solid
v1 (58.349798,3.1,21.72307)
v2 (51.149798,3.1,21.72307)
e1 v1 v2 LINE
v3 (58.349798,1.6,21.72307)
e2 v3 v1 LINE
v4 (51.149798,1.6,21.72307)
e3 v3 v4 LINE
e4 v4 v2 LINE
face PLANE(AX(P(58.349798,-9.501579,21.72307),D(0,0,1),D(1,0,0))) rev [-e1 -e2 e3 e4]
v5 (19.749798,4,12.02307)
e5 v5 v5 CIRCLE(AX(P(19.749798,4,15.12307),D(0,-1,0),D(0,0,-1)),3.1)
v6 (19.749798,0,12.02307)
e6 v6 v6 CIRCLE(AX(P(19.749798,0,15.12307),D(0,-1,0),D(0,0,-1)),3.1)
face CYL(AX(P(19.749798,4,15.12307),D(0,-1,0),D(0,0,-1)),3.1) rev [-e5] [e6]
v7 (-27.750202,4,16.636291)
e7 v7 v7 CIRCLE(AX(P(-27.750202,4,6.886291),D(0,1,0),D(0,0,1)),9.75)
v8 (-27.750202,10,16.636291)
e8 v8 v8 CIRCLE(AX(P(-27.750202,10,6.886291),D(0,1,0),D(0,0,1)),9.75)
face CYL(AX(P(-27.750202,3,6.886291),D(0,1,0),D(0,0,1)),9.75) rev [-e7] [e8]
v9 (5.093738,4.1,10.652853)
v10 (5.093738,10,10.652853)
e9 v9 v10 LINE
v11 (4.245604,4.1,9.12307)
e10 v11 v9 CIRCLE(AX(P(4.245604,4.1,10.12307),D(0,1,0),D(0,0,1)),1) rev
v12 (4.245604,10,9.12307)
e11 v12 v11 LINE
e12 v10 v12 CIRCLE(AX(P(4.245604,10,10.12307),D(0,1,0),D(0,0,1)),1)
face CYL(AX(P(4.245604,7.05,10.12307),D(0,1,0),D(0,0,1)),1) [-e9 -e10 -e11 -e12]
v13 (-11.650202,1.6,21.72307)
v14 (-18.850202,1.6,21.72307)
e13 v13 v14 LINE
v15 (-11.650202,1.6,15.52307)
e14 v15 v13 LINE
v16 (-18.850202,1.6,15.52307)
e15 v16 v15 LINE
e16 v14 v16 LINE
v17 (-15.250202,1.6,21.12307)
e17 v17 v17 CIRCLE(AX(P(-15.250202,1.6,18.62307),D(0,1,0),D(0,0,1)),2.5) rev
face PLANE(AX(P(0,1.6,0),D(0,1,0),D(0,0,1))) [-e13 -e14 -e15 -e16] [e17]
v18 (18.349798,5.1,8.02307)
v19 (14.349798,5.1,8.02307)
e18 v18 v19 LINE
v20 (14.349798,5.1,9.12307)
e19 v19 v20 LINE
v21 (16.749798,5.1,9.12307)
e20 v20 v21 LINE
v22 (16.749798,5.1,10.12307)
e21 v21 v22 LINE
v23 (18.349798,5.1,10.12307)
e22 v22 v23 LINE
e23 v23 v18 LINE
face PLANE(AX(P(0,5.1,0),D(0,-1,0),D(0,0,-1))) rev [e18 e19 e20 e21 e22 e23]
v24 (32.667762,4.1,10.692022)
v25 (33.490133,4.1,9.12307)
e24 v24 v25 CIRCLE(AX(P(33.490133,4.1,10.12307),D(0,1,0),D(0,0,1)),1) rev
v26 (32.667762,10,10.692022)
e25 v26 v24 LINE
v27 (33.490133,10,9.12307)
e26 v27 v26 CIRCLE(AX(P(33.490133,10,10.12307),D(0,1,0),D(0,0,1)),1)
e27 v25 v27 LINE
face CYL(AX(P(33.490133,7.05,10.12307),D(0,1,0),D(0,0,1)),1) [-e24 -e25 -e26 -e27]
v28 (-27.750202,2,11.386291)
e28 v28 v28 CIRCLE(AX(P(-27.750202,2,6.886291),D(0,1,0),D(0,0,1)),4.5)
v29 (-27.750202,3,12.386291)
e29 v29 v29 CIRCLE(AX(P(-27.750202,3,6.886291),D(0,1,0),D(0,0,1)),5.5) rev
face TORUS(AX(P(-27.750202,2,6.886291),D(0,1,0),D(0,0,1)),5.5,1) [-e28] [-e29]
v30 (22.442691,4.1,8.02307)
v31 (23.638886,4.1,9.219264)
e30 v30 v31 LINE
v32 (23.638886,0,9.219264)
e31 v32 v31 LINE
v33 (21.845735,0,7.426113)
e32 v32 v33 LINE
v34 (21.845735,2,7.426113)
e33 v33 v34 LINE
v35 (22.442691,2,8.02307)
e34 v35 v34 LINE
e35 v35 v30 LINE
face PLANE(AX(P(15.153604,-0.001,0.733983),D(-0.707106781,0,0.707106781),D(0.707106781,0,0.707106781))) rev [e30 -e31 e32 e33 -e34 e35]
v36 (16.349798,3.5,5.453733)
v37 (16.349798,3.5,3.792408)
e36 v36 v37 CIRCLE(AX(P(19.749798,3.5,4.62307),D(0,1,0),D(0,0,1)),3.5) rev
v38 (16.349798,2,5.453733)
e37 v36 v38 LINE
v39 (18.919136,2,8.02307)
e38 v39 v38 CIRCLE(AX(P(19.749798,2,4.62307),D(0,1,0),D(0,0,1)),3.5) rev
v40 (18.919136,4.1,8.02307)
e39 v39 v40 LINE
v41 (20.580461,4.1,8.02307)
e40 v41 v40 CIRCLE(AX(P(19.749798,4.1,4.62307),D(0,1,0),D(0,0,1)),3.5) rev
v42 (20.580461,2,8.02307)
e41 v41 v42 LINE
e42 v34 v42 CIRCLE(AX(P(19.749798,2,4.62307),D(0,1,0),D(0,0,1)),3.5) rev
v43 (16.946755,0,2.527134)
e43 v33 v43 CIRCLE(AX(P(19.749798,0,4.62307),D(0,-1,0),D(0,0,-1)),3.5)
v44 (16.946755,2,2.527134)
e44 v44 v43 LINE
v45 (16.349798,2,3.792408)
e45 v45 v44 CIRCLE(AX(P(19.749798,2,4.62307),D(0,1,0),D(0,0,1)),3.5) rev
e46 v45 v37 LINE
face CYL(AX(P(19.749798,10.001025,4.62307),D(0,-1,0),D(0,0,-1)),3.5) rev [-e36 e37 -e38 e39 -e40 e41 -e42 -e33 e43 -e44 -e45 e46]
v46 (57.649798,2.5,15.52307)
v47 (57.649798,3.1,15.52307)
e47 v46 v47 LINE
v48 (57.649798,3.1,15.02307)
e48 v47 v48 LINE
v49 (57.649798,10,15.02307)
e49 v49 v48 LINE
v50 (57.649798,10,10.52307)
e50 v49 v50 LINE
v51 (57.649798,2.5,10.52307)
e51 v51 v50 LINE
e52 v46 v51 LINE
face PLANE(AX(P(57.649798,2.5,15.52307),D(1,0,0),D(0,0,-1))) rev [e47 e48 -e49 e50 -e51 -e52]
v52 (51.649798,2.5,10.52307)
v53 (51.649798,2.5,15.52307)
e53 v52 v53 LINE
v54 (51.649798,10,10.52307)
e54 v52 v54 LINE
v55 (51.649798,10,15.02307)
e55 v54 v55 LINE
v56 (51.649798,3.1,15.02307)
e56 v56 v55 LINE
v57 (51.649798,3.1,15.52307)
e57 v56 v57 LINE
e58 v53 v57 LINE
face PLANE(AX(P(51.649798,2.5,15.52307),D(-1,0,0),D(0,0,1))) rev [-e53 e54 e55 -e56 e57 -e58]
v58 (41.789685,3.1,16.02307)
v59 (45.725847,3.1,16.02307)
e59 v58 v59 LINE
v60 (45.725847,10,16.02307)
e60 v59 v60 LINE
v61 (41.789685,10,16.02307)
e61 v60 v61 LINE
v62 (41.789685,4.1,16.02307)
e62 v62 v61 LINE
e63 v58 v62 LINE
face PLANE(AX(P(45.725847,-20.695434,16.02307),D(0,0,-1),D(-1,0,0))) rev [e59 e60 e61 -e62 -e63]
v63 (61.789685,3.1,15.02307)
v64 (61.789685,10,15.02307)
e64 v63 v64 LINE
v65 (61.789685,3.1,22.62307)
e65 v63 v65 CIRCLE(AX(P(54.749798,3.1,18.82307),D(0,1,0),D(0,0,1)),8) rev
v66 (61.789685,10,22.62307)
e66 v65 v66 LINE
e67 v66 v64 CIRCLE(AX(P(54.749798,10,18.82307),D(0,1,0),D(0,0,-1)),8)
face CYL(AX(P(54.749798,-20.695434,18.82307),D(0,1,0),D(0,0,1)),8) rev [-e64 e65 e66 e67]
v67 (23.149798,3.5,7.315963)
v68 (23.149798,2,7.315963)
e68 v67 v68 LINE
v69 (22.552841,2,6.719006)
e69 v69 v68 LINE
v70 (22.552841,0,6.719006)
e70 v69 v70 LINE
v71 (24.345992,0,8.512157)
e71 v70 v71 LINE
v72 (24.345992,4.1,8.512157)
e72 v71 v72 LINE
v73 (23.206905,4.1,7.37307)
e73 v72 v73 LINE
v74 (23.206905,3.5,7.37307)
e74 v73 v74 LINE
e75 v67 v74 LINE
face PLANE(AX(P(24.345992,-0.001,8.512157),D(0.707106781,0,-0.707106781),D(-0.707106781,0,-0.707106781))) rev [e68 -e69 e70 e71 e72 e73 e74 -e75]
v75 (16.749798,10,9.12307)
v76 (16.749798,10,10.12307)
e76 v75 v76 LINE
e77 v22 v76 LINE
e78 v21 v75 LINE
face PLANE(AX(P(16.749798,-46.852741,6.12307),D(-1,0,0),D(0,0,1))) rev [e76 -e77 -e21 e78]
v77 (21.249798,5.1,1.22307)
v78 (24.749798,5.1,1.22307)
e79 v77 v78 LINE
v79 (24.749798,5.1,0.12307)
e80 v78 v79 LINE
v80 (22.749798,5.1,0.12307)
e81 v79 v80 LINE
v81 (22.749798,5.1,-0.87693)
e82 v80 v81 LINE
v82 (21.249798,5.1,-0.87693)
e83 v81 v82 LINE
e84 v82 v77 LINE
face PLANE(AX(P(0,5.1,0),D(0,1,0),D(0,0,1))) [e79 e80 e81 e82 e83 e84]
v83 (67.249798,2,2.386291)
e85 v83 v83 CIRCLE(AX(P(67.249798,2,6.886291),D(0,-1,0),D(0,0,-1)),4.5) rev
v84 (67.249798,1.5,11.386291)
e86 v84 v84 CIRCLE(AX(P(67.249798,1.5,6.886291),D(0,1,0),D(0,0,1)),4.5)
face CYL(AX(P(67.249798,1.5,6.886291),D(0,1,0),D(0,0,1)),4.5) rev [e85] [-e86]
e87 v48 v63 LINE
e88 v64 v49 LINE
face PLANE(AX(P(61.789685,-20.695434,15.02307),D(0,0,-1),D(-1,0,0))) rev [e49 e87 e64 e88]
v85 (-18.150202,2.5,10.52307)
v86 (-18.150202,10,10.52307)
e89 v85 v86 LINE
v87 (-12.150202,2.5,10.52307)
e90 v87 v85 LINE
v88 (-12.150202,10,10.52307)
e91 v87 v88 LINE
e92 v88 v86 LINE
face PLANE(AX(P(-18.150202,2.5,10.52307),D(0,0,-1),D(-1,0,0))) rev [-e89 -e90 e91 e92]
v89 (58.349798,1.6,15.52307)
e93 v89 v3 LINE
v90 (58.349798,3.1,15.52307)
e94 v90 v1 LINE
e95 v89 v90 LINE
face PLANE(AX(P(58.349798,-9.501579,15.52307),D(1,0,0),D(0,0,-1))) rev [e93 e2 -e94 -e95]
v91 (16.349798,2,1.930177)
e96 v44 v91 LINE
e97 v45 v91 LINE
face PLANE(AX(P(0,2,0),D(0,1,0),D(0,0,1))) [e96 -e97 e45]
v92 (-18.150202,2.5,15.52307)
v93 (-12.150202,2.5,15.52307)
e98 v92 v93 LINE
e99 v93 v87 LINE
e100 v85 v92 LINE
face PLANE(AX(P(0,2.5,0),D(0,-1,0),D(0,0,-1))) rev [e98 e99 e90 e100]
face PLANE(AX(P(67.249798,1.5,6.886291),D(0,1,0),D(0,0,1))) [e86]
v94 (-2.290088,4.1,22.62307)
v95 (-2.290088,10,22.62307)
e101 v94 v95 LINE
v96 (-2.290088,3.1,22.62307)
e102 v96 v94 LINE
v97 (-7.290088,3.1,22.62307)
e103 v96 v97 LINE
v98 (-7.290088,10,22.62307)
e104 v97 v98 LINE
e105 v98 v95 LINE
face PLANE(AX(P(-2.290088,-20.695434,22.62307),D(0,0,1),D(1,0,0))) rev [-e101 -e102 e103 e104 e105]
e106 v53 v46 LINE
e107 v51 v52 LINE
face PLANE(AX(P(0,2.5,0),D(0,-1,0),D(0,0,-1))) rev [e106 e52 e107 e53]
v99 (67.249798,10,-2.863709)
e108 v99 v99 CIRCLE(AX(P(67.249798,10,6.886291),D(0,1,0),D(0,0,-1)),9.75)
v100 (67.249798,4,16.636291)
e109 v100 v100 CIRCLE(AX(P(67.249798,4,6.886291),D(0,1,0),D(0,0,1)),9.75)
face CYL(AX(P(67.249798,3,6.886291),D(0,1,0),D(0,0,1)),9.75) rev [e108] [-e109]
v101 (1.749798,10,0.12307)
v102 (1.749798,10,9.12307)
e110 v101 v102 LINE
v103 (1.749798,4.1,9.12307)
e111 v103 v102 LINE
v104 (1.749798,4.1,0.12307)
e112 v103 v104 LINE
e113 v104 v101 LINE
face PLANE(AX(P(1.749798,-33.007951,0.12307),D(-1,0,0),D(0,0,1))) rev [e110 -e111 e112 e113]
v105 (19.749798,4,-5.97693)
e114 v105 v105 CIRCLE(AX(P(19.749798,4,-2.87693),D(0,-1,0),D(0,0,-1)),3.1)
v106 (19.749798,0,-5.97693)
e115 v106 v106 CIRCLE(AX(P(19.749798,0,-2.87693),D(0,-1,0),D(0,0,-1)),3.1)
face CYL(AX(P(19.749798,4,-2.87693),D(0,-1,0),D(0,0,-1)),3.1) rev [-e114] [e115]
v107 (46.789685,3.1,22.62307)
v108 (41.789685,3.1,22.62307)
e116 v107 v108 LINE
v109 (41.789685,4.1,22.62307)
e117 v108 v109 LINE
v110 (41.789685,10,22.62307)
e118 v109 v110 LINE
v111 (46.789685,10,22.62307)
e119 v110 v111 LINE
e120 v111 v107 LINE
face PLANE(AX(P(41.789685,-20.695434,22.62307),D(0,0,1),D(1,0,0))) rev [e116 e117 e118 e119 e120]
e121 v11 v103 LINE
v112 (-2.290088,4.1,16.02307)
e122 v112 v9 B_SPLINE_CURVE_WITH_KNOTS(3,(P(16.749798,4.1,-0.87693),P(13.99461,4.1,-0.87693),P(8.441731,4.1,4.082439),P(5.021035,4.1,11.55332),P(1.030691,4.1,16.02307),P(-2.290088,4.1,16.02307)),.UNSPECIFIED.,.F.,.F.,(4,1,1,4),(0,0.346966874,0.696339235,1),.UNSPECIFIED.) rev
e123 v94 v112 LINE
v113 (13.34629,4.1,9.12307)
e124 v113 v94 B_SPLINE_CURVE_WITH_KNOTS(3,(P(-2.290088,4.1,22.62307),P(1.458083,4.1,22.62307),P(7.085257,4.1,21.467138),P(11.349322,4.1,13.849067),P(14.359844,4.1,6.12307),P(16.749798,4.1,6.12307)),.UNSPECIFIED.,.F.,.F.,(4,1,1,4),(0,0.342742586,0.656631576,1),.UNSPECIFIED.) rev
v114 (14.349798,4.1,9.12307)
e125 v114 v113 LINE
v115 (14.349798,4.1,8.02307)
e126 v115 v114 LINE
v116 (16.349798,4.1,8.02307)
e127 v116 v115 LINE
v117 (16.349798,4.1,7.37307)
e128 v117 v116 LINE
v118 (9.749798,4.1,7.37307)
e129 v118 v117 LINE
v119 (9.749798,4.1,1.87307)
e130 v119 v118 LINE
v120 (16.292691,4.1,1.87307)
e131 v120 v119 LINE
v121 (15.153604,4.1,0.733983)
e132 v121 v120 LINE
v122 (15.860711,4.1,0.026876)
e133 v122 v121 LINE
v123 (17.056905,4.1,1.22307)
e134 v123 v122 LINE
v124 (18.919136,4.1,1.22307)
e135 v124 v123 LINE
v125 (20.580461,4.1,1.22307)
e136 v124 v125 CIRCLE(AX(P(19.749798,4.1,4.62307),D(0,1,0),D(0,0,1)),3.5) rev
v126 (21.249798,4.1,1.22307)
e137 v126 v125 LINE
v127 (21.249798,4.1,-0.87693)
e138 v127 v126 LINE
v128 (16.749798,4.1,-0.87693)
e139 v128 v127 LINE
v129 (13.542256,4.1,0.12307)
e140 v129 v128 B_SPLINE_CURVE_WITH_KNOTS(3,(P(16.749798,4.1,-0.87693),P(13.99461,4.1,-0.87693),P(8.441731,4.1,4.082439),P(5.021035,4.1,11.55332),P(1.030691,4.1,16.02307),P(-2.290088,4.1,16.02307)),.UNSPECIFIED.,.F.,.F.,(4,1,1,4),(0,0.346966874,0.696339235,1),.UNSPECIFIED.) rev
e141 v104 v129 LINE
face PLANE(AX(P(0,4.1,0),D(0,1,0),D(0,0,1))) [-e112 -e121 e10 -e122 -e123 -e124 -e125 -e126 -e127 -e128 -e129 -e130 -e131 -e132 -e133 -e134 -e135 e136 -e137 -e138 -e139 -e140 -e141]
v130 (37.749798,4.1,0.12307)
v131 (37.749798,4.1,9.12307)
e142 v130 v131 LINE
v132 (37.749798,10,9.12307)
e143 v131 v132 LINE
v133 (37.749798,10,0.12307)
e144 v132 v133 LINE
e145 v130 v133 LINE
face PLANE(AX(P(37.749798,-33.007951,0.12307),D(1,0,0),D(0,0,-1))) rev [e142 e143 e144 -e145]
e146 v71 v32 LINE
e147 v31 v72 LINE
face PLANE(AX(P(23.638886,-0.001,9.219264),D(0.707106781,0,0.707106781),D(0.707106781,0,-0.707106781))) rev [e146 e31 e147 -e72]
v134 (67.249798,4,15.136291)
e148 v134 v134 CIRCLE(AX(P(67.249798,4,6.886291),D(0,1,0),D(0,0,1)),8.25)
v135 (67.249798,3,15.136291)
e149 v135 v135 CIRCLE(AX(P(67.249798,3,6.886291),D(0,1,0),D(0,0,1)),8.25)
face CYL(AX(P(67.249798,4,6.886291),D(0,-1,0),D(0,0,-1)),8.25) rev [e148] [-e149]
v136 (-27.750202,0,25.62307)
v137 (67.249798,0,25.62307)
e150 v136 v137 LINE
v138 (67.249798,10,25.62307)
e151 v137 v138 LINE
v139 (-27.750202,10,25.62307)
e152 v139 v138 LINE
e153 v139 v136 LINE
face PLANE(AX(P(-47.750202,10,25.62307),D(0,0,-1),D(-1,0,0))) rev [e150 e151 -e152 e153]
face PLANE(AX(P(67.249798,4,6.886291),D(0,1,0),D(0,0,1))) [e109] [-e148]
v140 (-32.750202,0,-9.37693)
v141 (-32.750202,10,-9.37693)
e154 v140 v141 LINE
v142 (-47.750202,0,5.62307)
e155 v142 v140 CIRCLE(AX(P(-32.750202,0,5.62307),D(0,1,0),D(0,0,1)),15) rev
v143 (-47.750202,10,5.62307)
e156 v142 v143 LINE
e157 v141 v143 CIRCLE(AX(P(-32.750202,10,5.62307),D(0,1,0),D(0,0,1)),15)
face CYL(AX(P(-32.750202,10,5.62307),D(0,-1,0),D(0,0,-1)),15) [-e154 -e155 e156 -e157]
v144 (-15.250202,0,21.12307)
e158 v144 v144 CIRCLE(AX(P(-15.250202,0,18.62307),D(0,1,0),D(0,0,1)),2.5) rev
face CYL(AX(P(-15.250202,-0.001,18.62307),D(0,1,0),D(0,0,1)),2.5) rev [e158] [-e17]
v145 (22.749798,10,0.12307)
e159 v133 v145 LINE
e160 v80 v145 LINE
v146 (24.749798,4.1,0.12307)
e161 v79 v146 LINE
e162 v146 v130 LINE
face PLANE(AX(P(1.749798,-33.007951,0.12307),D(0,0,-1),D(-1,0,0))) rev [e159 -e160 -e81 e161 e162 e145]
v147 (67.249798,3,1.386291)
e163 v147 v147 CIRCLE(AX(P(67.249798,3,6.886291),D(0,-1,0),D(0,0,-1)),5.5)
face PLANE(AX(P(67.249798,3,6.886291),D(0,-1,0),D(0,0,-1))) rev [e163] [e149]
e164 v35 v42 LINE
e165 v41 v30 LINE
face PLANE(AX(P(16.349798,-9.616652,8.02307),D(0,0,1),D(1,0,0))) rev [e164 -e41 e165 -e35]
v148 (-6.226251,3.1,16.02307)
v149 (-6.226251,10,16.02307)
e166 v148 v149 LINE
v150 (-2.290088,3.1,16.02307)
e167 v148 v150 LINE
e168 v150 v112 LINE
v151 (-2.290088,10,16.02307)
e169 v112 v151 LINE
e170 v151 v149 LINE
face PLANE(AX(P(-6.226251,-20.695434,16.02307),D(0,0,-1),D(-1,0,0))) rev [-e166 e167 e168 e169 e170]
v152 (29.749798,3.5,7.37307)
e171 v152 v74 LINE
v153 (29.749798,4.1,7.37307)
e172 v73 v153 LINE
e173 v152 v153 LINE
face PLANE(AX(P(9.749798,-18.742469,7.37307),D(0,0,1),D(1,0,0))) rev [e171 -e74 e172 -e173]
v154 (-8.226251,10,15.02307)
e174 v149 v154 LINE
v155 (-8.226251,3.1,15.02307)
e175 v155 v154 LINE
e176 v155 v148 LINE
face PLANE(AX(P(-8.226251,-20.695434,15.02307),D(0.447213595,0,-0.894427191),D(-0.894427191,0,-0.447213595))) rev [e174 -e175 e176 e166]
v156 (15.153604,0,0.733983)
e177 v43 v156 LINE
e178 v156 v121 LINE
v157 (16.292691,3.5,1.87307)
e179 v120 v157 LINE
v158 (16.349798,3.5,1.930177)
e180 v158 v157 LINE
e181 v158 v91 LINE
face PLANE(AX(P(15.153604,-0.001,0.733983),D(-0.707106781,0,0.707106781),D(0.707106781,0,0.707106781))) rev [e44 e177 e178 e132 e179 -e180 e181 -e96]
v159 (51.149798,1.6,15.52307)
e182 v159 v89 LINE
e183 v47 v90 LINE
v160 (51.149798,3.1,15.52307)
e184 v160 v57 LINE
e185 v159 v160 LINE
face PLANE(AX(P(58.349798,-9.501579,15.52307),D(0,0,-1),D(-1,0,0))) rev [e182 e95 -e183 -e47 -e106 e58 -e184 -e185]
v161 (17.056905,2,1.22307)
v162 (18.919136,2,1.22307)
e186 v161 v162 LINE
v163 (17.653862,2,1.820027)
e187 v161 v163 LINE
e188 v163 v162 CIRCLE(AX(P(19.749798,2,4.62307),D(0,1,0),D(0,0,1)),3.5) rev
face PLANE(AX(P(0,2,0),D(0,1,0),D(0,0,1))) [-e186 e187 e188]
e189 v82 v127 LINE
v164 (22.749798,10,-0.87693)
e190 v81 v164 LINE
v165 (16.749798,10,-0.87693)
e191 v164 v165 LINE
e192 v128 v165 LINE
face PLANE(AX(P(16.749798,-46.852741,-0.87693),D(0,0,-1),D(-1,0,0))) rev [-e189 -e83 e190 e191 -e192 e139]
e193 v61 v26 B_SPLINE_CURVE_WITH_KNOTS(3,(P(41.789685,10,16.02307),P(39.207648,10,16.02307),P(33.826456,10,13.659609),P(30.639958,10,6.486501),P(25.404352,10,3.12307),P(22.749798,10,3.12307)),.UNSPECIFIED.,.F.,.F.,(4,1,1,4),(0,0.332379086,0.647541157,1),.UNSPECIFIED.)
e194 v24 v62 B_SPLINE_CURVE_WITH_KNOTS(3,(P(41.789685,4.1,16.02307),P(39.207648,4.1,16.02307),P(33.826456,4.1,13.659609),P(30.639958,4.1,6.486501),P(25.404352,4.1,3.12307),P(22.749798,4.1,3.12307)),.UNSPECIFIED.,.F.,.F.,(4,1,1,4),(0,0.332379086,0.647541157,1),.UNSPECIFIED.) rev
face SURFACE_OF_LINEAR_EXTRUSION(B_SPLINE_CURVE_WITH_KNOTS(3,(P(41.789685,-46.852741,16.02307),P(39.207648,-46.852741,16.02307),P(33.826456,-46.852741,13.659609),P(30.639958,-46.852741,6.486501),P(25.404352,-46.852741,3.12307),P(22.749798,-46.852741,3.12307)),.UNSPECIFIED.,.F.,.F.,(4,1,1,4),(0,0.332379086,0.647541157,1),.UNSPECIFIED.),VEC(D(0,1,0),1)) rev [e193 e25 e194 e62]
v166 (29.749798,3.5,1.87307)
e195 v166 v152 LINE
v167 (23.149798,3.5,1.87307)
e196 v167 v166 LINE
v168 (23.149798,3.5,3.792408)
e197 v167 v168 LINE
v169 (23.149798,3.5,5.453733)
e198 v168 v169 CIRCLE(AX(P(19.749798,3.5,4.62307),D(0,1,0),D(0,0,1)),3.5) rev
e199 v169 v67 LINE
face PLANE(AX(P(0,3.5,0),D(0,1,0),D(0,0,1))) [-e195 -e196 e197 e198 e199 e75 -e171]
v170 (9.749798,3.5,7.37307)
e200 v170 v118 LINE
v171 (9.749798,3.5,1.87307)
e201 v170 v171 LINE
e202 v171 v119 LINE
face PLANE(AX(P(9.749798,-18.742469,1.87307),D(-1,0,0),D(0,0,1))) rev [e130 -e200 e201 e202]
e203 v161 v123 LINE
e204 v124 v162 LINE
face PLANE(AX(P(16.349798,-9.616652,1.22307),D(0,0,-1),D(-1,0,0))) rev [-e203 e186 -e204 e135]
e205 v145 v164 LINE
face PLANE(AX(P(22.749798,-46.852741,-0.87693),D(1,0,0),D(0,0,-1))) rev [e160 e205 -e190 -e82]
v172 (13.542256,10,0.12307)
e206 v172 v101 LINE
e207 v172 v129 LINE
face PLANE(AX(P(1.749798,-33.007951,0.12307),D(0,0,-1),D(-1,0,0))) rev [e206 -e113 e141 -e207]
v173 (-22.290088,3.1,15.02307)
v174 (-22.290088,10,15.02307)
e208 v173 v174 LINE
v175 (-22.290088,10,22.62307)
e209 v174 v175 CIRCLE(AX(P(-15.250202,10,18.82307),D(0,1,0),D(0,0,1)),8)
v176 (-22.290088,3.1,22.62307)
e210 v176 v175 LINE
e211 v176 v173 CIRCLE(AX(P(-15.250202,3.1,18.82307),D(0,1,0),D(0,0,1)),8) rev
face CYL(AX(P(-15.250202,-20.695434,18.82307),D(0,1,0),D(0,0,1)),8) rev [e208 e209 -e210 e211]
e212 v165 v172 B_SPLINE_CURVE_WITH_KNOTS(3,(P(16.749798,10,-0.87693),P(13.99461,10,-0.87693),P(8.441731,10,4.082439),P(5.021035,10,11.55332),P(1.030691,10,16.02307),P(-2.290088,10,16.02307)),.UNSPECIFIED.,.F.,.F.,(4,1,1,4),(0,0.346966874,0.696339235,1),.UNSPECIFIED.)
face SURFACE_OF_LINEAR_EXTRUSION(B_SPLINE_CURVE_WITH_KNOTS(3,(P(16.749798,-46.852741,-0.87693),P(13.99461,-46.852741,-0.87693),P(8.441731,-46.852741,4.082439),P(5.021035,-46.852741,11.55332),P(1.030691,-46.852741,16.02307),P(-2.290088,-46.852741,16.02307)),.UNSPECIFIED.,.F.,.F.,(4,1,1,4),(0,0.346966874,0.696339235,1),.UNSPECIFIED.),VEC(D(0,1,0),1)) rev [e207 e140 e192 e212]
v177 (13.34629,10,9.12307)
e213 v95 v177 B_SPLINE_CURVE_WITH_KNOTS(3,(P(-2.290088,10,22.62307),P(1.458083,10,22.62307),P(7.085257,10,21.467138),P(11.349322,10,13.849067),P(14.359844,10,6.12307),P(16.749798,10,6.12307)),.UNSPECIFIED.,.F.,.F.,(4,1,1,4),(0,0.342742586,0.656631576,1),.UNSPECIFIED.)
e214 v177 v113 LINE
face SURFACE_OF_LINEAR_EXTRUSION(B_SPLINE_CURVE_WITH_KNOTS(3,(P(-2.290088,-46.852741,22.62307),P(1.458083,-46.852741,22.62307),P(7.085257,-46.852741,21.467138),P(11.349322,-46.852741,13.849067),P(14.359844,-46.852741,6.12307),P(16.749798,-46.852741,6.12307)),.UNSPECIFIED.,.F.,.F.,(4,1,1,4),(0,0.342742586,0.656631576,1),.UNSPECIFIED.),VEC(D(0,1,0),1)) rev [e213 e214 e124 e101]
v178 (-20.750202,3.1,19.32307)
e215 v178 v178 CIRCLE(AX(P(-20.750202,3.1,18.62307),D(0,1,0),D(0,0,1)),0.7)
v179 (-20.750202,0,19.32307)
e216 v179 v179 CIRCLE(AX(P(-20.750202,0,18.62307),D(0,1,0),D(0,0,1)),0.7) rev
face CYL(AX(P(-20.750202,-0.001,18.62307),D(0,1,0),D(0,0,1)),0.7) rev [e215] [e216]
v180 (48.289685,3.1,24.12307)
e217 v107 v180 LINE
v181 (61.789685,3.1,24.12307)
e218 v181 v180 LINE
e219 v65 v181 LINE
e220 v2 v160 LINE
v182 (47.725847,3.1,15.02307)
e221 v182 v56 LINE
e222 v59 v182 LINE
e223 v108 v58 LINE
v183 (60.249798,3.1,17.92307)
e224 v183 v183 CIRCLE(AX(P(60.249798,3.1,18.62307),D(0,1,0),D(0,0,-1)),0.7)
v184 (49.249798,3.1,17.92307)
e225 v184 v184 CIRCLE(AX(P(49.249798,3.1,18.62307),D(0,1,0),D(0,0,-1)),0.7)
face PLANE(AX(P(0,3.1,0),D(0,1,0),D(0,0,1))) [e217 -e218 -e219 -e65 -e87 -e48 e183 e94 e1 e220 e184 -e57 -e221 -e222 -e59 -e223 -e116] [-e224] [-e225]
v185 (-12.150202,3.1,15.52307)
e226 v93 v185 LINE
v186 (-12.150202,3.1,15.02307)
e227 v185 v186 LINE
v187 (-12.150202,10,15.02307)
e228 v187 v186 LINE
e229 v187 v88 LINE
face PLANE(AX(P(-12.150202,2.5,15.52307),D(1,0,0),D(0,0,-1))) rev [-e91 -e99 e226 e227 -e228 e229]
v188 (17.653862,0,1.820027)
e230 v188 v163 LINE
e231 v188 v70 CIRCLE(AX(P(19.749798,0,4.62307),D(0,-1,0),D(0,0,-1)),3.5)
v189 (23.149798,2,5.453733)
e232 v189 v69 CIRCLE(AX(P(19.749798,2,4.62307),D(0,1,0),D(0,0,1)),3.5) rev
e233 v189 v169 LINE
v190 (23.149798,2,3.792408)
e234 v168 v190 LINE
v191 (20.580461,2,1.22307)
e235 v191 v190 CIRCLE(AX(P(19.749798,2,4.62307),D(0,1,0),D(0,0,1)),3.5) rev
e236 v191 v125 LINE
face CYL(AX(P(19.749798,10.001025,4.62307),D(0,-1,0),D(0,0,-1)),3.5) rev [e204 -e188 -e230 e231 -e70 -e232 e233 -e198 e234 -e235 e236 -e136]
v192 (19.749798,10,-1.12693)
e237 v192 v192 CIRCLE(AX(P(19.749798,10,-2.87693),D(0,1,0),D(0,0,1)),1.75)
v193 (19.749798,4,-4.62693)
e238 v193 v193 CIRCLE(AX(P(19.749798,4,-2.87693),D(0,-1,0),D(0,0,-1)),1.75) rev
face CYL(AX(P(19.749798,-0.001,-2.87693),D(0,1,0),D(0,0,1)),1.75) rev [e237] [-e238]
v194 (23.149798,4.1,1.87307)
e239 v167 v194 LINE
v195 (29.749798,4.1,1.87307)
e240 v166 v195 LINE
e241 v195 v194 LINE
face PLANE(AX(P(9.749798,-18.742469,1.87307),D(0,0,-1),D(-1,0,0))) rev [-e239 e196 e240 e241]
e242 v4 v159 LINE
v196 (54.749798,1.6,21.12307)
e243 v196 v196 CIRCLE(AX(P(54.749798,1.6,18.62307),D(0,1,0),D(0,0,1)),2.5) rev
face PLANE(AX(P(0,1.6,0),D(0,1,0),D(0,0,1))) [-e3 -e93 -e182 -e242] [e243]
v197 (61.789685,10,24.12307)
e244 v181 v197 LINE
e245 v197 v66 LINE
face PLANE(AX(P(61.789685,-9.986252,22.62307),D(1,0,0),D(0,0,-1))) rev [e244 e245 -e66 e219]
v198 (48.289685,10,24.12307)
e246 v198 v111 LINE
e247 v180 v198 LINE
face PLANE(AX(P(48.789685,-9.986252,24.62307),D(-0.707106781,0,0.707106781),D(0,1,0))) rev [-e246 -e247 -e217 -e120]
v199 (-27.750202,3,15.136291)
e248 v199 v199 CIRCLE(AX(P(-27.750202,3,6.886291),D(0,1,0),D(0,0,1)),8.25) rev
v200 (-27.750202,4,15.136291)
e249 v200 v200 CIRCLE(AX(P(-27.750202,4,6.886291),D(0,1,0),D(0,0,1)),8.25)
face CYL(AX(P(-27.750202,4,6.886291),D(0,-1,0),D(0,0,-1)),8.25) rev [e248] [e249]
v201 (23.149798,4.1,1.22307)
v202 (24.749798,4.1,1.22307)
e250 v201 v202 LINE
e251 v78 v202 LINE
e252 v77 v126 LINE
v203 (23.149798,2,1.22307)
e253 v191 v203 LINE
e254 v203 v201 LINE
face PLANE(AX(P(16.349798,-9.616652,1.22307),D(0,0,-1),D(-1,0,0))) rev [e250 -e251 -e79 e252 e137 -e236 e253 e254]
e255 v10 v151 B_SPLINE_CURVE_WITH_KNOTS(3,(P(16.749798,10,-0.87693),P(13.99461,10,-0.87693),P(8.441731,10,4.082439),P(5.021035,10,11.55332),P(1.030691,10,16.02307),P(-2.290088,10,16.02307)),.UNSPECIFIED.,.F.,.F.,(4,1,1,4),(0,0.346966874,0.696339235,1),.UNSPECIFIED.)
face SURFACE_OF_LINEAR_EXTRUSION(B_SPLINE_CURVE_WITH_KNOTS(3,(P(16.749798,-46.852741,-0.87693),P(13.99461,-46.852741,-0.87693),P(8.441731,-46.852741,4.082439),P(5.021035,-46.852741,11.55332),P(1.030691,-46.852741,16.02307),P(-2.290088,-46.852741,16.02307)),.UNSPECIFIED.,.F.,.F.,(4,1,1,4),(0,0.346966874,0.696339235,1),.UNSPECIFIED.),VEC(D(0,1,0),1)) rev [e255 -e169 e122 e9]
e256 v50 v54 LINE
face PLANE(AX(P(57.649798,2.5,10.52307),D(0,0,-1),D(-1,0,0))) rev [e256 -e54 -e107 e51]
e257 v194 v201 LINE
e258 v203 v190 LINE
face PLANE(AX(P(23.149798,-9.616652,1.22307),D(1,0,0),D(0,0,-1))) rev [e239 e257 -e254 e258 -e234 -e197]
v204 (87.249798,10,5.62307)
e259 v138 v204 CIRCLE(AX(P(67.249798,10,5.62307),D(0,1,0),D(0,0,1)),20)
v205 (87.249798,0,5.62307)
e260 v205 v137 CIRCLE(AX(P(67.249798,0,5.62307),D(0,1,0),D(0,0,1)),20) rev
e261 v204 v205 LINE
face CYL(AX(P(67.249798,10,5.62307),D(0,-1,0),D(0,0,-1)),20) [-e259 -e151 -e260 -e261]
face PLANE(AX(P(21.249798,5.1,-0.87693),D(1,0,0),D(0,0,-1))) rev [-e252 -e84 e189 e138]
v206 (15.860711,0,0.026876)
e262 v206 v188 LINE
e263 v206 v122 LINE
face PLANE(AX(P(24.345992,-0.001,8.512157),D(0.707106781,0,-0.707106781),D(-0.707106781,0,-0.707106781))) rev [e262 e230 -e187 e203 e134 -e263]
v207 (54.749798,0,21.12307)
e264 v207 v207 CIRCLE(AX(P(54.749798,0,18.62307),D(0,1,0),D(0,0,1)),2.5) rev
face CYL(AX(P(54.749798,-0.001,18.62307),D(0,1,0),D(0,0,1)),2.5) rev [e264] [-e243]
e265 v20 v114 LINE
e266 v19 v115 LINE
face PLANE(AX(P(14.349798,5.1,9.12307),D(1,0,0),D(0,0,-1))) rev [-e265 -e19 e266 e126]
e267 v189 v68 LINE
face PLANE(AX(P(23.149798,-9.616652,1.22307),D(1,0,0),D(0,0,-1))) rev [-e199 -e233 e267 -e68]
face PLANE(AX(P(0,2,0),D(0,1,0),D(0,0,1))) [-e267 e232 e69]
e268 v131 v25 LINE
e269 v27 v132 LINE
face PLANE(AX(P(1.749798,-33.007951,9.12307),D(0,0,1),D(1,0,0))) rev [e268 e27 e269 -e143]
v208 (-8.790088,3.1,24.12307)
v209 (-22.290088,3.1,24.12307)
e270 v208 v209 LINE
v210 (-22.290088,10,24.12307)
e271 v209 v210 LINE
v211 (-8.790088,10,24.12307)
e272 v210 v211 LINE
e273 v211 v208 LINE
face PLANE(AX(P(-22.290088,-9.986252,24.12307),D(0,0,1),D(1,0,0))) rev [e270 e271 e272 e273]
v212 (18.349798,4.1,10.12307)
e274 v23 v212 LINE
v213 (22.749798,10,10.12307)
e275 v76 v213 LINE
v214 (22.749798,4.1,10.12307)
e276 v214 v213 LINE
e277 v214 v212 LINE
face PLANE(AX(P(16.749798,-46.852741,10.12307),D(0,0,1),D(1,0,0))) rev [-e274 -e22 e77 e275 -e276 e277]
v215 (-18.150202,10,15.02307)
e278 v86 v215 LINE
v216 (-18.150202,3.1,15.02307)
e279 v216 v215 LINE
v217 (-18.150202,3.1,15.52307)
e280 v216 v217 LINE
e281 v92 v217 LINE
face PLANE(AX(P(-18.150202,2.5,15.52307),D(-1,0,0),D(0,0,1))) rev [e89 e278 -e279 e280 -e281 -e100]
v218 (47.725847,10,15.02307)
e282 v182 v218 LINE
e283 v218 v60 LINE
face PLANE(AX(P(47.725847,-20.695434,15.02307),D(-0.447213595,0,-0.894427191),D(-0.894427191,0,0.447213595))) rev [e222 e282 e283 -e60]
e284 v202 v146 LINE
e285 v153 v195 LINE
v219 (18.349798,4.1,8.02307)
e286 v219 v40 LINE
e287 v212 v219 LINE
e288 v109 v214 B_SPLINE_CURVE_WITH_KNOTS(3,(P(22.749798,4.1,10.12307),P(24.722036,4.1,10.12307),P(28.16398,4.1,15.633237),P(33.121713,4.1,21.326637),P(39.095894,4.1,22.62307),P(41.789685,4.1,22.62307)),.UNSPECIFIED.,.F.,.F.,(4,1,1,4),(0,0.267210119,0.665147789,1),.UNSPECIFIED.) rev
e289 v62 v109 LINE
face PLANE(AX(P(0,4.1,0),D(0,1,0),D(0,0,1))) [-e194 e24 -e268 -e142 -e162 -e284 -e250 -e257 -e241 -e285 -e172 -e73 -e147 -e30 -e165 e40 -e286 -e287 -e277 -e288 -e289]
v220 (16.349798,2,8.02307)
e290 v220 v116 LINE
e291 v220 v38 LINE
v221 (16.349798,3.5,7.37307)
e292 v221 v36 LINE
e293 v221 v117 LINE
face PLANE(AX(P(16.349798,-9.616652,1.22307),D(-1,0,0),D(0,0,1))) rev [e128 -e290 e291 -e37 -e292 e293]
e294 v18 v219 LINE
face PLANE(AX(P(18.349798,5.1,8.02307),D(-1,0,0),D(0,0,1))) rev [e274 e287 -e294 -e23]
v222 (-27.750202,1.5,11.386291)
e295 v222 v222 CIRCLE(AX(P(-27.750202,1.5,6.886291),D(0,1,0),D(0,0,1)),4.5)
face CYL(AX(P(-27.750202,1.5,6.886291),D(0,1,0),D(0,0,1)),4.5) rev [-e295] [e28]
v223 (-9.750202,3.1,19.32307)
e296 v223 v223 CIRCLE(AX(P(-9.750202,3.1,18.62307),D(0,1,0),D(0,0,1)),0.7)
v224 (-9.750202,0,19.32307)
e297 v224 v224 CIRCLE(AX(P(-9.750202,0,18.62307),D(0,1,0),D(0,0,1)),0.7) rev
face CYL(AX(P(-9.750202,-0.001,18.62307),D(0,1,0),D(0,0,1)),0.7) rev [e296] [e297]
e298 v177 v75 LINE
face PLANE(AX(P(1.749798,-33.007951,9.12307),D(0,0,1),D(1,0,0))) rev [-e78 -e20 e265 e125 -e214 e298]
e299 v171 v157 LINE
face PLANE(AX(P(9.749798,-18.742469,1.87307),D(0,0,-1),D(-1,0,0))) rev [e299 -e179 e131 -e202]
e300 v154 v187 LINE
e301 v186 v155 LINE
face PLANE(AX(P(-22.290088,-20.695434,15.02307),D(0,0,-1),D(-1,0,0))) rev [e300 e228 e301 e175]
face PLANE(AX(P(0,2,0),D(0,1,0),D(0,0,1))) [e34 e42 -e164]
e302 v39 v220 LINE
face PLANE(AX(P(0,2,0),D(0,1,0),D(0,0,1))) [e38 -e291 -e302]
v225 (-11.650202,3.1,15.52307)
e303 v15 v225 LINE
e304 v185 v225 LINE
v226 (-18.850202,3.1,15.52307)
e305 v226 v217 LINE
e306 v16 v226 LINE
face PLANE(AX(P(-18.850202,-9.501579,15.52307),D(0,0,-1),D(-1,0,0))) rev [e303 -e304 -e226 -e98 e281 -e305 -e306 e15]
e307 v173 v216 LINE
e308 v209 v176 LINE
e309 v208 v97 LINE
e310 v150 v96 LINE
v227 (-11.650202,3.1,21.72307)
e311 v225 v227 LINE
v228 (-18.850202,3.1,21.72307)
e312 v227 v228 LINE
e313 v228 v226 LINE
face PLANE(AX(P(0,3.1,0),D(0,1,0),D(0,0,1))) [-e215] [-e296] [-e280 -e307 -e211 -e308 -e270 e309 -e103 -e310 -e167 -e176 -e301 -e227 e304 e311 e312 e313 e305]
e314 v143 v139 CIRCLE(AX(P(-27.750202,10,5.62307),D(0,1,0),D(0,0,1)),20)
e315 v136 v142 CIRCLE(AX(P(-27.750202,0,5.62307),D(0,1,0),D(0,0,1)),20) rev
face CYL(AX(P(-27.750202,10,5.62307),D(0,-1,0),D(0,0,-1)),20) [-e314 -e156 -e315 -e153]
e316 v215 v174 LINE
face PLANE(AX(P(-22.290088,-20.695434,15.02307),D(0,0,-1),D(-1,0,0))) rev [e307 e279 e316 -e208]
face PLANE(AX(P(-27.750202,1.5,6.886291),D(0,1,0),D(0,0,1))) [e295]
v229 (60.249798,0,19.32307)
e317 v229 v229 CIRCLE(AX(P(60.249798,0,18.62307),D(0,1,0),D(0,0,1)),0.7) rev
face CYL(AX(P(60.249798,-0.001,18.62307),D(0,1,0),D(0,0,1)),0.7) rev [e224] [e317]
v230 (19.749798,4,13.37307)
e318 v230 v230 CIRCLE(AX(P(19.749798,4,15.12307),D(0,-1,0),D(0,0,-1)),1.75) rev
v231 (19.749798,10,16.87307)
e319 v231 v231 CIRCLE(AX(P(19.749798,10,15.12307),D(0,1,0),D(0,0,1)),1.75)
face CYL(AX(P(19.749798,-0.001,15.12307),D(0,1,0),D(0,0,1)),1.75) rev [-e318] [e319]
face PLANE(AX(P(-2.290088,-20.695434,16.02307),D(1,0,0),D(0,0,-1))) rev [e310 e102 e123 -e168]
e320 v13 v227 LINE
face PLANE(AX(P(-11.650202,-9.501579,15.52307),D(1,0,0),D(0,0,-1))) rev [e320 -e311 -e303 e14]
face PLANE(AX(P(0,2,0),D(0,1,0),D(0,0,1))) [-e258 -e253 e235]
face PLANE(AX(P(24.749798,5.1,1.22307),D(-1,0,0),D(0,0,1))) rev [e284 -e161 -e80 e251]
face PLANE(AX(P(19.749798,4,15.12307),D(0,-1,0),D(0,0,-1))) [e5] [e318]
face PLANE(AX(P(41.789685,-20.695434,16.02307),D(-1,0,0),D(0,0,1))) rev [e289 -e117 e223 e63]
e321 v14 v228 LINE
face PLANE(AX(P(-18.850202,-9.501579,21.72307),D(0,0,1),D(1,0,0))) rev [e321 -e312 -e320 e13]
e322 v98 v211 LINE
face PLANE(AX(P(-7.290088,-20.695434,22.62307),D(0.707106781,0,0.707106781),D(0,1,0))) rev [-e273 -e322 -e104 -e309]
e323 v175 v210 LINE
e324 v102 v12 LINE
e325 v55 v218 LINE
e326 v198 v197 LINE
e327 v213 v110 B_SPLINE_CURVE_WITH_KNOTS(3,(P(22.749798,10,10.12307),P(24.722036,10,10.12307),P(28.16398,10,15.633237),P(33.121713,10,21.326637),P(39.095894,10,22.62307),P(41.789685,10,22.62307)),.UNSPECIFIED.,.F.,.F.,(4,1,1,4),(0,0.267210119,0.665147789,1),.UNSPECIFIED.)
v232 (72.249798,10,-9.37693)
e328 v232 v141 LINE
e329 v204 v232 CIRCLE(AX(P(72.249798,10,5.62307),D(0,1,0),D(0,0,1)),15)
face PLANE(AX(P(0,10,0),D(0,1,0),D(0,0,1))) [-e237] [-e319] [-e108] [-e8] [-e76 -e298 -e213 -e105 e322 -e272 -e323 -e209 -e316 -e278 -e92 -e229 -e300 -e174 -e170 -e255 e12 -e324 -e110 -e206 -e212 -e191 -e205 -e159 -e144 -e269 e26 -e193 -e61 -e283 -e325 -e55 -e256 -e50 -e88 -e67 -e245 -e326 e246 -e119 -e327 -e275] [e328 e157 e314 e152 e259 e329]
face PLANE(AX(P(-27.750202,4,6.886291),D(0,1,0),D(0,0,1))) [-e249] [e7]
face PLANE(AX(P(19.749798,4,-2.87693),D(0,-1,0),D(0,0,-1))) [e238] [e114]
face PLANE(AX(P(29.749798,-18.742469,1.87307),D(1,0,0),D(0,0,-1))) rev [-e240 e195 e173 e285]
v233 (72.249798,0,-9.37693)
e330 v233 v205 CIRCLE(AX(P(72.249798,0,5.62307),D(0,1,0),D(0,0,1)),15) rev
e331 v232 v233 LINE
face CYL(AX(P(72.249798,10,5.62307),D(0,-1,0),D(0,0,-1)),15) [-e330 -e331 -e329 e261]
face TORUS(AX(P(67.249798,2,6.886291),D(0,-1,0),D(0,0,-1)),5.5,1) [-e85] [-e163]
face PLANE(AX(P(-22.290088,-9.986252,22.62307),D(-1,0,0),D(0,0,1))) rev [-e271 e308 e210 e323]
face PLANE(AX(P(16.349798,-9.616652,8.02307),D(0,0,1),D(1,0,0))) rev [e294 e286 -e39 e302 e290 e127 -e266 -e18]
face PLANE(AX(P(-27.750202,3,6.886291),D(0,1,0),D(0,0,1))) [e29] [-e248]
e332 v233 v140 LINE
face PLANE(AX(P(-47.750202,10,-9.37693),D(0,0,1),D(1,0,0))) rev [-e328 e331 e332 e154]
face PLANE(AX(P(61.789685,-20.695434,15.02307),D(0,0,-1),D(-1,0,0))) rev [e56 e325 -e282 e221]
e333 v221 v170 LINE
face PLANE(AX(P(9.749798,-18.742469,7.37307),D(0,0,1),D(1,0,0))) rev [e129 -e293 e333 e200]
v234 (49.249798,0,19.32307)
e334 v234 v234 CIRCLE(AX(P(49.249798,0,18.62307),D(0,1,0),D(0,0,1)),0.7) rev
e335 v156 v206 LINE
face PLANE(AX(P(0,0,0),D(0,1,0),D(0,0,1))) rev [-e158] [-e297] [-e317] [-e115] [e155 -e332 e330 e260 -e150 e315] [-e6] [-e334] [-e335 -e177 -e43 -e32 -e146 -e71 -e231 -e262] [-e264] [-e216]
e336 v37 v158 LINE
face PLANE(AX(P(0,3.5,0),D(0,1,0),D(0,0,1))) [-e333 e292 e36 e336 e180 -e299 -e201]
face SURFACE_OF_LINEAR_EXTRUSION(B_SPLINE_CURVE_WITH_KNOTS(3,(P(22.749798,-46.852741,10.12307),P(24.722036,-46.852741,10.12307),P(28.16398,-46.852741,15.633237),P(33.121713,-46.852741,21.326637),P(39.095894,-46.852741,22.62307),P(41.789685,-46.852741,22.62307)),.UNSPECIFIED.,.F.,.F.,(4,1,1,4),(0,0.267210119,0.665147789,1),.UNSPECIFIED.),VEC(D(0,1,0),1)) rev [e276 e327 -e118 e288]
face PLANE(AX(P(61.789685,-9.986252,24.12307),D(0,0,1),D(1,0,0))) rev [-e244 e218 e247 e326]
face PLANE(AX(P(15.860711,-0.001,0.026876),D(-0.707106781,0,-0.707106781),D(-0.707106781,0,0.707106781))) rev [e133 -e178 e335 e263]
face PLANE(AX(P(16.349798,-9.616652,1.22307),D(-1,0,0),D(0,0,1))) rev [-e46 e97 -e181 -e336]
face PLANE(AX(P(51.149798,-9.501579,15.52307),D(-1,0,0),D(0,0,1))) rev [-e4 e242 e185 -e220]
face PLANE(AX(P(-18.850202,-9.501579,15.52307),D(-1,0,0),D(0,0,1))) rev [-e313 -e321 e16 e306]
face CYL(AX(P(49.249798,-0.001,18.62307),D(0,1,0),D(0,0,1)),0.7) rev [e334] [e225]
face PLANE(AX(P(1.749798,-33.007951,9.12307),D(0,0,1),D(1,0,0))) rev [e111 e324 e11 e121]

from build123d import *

# Parameters (mm, degrees)
SKETCH1_W                = 135
SKETCH1_H                = 35
BOSS_EXTRUDE1_DEPTH      = 10
FILLET1_R                = 20
CUT_EXTRUDE3_REACH       = 93.483
SKETCH5_R                = 1.75
SKETCH6_R                = 3.1
CUT_EXTRUDE4_DEPTH       = 4
FILLET2_R                = 15
SKETCH3_R                = 9.75
CUT_EXTRUDE5_DEPTH       = 7
BOSS_EXTRUDE2_START      = 1
SKETCH9_R                = 9.75
SKETCH9_R_2              = 8.25
BOSS_EXTRUDE2_DEPTH      = 1
SKETCH10_R               = 4.5
CUT_EXTRUDE6_DEPTH       = 1.5
FILLET3_R                = 1
CUT_EXTRUDE7_REACH       = 93.483
SKETCH7_R                = 2.5
SKETCH11_W               = 7.2
SKETCH11_H               = 6.2
CUT_EXTRUDE8_DEPTH       = 8.4
CUT_EXTRUDE9_DEPTH       = 6.9
CUT_EXTRUDE10_DEPTH      = 5.9
CUT_EXTRUDE11_REACH      = 93.483
SKETCH14_R               = 3.5
CUT_EXTRUDE12_DEPTH      = 5.9
CUT_EXTRUDE12_DEPTH_BACK = 2.1
SKETCH15_W               = 6.8
SKETCH15_H               = 6.8
SKETCH16_W               = 36
SKETCH16_H               = 9
CUT_EXTRUDE13_DEPTH      = 5.9
BOSS_EXTRUDE3_DEPTH      = 1
SKETCH18_W               = 6
SKETCH18_H               = 5
CUT_EXTRUDE14_DEPTH      = 7.5
SKETCH19_W               = 13
SKETCH19_H               = 1.5
CUT_EXTRUDE15_DEPTH      = 6.9
CHAMFER1_SIZE            = 2
FILLET4_R                = 1
CUT_EXTRUDE16_REACH      = 93.196
SKETCH20_R               = 0.7
CUT_EXTRUDE17_START      = -4.1
CUT_EXTRUDE17_DEPTH      = 10
SKETCH22_W               = 20
SKETCH22_H               = 5.5
CUT_EXTRUDE18_DEPTH      = 0.6


# Some blends are built 0.0001 mm under size
with BuildPart() as part:
    # Sketch1 → Boss-Extrude1 (new body)
    with BuildSketch(Plane(origin=(0, 0, 0), x_dir=(1, 0, 0), z_dir=(0, 1, 0))):
        with Locations((19.749798241, -8.123070146)):
            Rectangle(SKETCH1_W, SKETCH1_H)
    extrude(amount=BOSS_EXTRUDE1_DEPTH)

    # Fillet1
    fillet1_edges = [part.edges().sort_by_distance(p)[0] for p in [
        (87.249798241, 5, 25.623070146),
        (-47.750201759, 5, 25.623070146),
    ]]
    fillet(fillet1_edges, radius=FILLET1_R)

    # Sketch5 → Cut-Extrude3 (cut, up to next)
    with BuildSketch(Plane(origin=(0, 10, 0), x_dir=(1, 0, 0), z_dir=(0, 1, 0)), mode=Mode.PRIVATE) as cut_extrude3_sk1:
        with Locations(Location((19.749798241, 2.876929854, 0), (0, 0, 270))):
            Circle(SKETCH5_R)
    cut_extrude3_tool1 = extrude(cut_extrude3_sk1.sketch, amount=-CUT_EXTRUDE3_REACH, mode=Mode.PRIVATE) & part.part
    # Sketch5 → Cut-Extrude3 (cut, up to next)
    with BuildSketch(Plane(origin=(0, 10, 0), x_dir=(1, 0, 0), z_dir=(0, 1, 0)), mode=Mode.PRIVATE) as cut_extrude3_sk2:
        with Locations(Location((19.749798241, -15.123070146, 0), (0, 0, 270))):
            Circle(SKETCH5_R)
    cut_extrude3_tool2 = extrude(cut_extrude3_sk2.sketch, amount=-CUT_EXTRUDE3_REACH, mode=Mode.PRIVATE) & part.part
    add(cut_extrude3_tool1.solids().sort_by_distance((19.749798, 10, -2.87693))[0], mode=Mode.SUBTRACT)
    add(cut_extrude3_tool2.solids().sort_by_distance((19.749798, 10, 15.12307))[0], mode=Mode.SUBTRACT)

    # Sketch6 → Cut-Extrude4 (cut)
    with BuildSketch(Plane.XZ):
        with Locations(Location((19.749798241, 15.123070146, 0), (0, 0, 270))):
            Circle(SKETCH6_R)
        with Locations(Location((19.749798241, -2.876929854, 0), (0, 0, 270))):
            Circle(SKETCH6_R)
    extrude(amount=-CUT_EXTRUDE4_DEPTH, mode=Mode.SUBTRACT)

    # Fillet2
    fillet2_edges = [part.edges().sort_by_distance(p)[0] for p in [
        (-47.750201759, 5, -9.376929854),
        (87.249798241, 5, -9.376929854),
    ]]
    fillet(fillet2_edges, radius=FILLET2_R - 0.0001)  # a hair under: the kernel refuses the full size

    # Sketch3 → Cut-Extrude5 (cut)
    with BuildSketch(Plane(origin=(0, 10, 0), x_dir=(1, 0, 0), z_dir=(0, 1, 0))):
        with Locations(Location((-27.750201759, -6.88629089, 0), (0, 0, 270))):
            Circle(SKETCH3_R)
        with Locations(Location((67.249798241, -6.88629089, 0), (0, 0, 90))):
            Circle(SKETCH3_R)
    extrude(amount=-CUT_EXTRUDE5_DEPTH, mode=Mode.SUBTRACT)

    # Sketch9 → Boss-Extrude2 (add)
    # profile 1 of 2: a face of its own
    with BuildSketch(Plane(origin=(0, 3, 0), x_dir=(1, 0, 0), z_dir=(0, 1, 0)).offset(BOSS_EXTRUDE2_START)):
        with Locations(Location((-27.750201759, -6.88629089, 0), (0, 0, 270))):
            Circle(SKETCH9_R)
        with Locations(Location((-27.750201759, -6.88629089, 0), (0, 0, 270))):
            Circle(SKETCH9_R_2, mode=Mode.SUBTRACT)
    # profile 2 of 2: a face of its own
    with BuildSketch(Plane(origin=(0, 3, 0), x_dir=(1, 0, 0), z_dir=(0, 1, 0)).offset(BOSS_EXTRUDE2_START)):
        with Locations(Location((67.249798241, -6.88629089, 0), (0, 0, 270))):
            Circle(SKETCH9_R)
        with Locations(Location((67.249798241, -6.88629089, 0), (0, 0, 270))):
            Circle(SKETCH9_R_2, mode=Mode.SUBTRACT)
    extrude(amount=-BOSS_EXTRUDE2_DEPTH)

    # Sketch10 → Cut-Extrude6 (cut)
    with BuildSketch(Plane(origin=(0, 3, 0), x_dir=(1, 0, 0), z_dir=(0, 1, 0))):
        with Locations(Location((-27.750201759, -6.88629089, 0), (0, 0, 270))):
            Circle(SKETCH10_R)
        with Locations(Location((67.249798241, -6.88629089, 0), (0, 0, 270))):
            Circle(SKETCH10_R)
    extrude(amount=-CUT_EXTRUDE6_DEPTH, mode=Mode.SUBTRACT)

    # Fillet3
    fillet3_edges = [part.edges().sort_by_distance(p)[0] for p in [
        (-27.750201759, 3, 2.38629089),
        (67.249798241, 3, 2.38629089),
    ]]
    fillet(fillet3_edges, radius=FILLET3_R)

    # Sketch7 → Cut-Extrude7 (cut, up to next)
    with BuildSketch(Plane(origin=(0, 10, 0), x_dir=(1, 0, 0), z_dir=(0, 1, 0)), mode=Mode.PRIVATE) as cut_extrude7_sk1:
        with Locations(Location((-15.250201759, -18.623070146, 0), (0, 0, 270))):
            Circle(SKETCH7_R)
    cut_extrude7_tool1 = extrude(cut_extrude7_sk1.sketch, amount=-CUT_EXTRUDE7_REACH, mode=Mode.PRIVATE) & part.part
    # Sketch7 → Cut-Extrude7 (cut, up to next)
    with BuildSketch(Plane(origin=(0, 10, 0), x_dir=(1, 0, 0), z_dir=(0, 1, 0)), mode=Mode.PRIVATE) as cut_extrude7_sk2:
        with Locations(Location((54.749798241, -18.623070146, 0), (0, 0, 270))):
            Circle(SKETCH7_R)
    cut_extrude7_tool2 = extrude(cut_extrude7_sk2.sketch, amount=-CUT_EXTRUDE7_REACH, mode=Mode.PRIVATE) & part.part
    add(cut_extrude7_tool1.solids().sort_by_distance((-15.250202, 10, 18.62307))[0], mode=Mode.SUBTRACT)
    add(cut_extrude7_tool2.solids().sort_by_distance((54.749798, 10, 18.62307))[0], mode=Mode.SUBTRACT)

    # Sketch11 → Cut-Extrude8 (cut)
    with BuildSketch(Plane(origin=(0, 10, 0), x_dir=(1, 0, 0), z_dir=(0, 1, 0))):
        with Locations((-15.250201759, -18.623070146)):
            Rectangle(SKETCH11_W, SKETCH11_H)
        with Locations((54.749798241, -18.623070146)):
            Rectangle(SKETCH11_W, SKETCH11_H)
    extrude(amount=-CUT_EXTRUDE8_DEPTH, mode=Mode.SUBTRACT)

    # Sketch12 → Cut-Extrude9 (cut)
    with BuildSketch(Plane(origin=(0, 10, 0), x_dir=(1, 0, 0), z_dir=(0, 1, 0))):
        with BuildLine():
            Line((-2.290088122, -16.023070146), (-2.290088122, -22.623070146))
            Line((-2.290088122, -22.623070146), (-22.290088122, -22.623070146))
            ThreePointArc((-22.290088122, -22.623070146), (-23.250201759, -18.823070146), (-22.290088122, -15.023070146))
            Line((-22.290088122, -15.023070146), (-8.226250735, -15.023070146))
            Line((-8.226250735, -15.023070146), (-6.226250735, -16.023070146))
            Line((-6.226250735, -16.023070146), (-2.290088122, -16.023070146))
        make_face()
        with BuildLine():
            Line((45.725847218, -16.023070146), (41.789684604, -16.023070146))
            Line((41.789684604, -16.023070146), (41.789684604, -22.623070146))
            Line((41.789684604, -22.623070146), (61.789684604, -22.623070146))
            ThreePointArc((61.789684604, -22.623070146), (62.749798241, -18.823070146), (61.789684604, -15.023070146))
            Line((61.789684604, -15.023070146), (47.725847218, -15.023070146))
            Line((47.725847218, -15.023070146), (45.725847218, -16.023070146))
        make_face()
    extrude(amount=-CUT_EXTRUDE9_DEPTH, mode=Mode.SUBTRACT)

    # Sketch13 → Cut-Extrude10 (cut)
    with BuildSketch(Plane(origin=(0, 10, 0), x_dir=(1, 0, 0), z_dir=(0, 1, 0))):
        with BuildLine():
            Line((16.749798241, -6.123070146), (16.749798241, -10.123070146))
            Line((16.749798241, -10.123070146), (22.749798241, -10.123070146))
            add(Edge.make_bspline(
                [(22.749798241, -10.123070146), (24.722036045, -10.123070146), (28.163979579, -15.633237451), (33.12171253, -21.326637483), (39.095893997, -22.623070146), (41.789684604, -22.623070146)],
                knots=[0, 0, 0, 0, 0.267210119, 0.665147789, 1, 1, 1, 1], degree=3))
            Line((41.789684604, -22.623070146), (41.789684604, -16.023070146))
            add(Edge.make_bspline(
                [(22.749798241, -3.123070146), (25.404352013, -3.123070146), (30.639958492, -6.486500824), (33.826455572, -13.659608817), (39.207647597, -16.023070146), (41.789684604, -16.023070146)],
                knots=[0, 0, 0, 0, 0.352458843, 0.667620914, 1, 1, 1, 1], degree=3))
            Line((22.749798241, -3.123070146), (22.749798241, 0.876929854))
            Line((22.749798241, 0.876929854), (16.749798241, 0.876929854))
            add(Edge.make_bspline(
                [(-2.290088122, -16.023070146), (1.030690921, -16.023070146), (5.021034942, -11.553320405), (8.441730898, -4.082439458), (13.994609535, 0.876929854), (16.749798241, 0.876929854)],
                knots=[0, 0, 0, 0, 0.303660765, 0.653033126, 1, 1, 1, 1], degree=3))
            Line((-2.290088122, -16.023070146), (-2.290088122, -22.623070146))
            add(Edge.make_bspline(
                [(-2.290088122, -22.623070146), (1.458082619, -22.623070146), (7.085257022, -21.467137706), (11.349322106, -13.849067405), (14.359844143, -6.123070146), (16.749798241, -6.123070146)],
                knots=[0, 0, 0, 0, 0.342742586, 0.656631576, 1, 1, 1, 1], degree=3))
        make_face()
    extrude(amount=-CUT_EXTRUDE10_DEPTH, mode=Mode.SUBTRACT)

    # Sketch14 → Cut-Extrude11 (cut, up to next)
    with BuildSketch(Plane.XZ, mode=Mode.PRIVATE) as cut_extrude11_sk1:
        with Locations(Location((19.749798241, 4.623070146, 0), (0, 0, 270))):
            Circle(SKETCH14_R)
    cut_extrude11_tool1 = extrude(cut_extrude11_sk1.sketch, amount=-CUT_EXTRUDE11_REACH, mode=Mode.PRIVATE) & part.part
    add(cut_extrude11_tool1.solids().sort_by_distance((19.749798, 0, 4.62307))[0], mode=Mode.SUBTRACT)

    # Sketch15 → Cut-Extrude12 (cut, two sides: drawn at the far end of the back side and taken through both)
    with BuildSketch(Plane(origin=(0, 4.1, 0), x_dir=(1, 0, 0), z_dir=(0, 1, 0)).offset(-CUT_EXTRUDE12_DEPTH_BACK)):
        with Locations((19.749798241, -4.623070146)):
            Rectangle(SKETCH15_W, SKETCH15_H)
    extrude(amount=CUT_EXTRUDE12_DEPTH + CUT_EXTRUDE12_DEPTH_BACK, mode=Mode.SUBTRACT)

    # Sketch16 → Cut-Extrude13 (cut)
    with BuildSketch(Plane(origin=(0, 10, 0), x_dir=(1, 0, 0), z_dir=(0, 1, 0))):
        with Locations((19.749798241, -4.623070146)):
            Rectangle(SKETCH16_W, SKETCH16_H)
    extrude(amount=-CUT_EXTRUDE13_DEPTH, mode=Mode.SUBTRACT)

    # Sketch17 → Boss-Extrude3 (add)
    with BuildSketch(Plane(origin=(0, 4.1, 0), x_dir=(1, 0, 0), z_dir=(0, 1, 0))):
        Polygon((14.349798241, -8.023070146), (18.349798241, -8.023070146), (18.349798241, -10.123070146), (16.749798241, -10.123070146), (16.749798241, -9.123070146), (14.349798241, -9.123070146), align=None)
        Polygon((21.249798241, -1.223070146), (24.749798241, -1.223070146), (24.749798241, -0.123070146), (22.749798241, -0.123070146), (22.749798241, 0.876929854), (21.249798241, 0.876929854), align=None)
    extrude(amount=BOSS_EXTRUDE3_DEPTH)

    # Sketch18 → Cut-Extrude14 (cut)
    with BuildSketch(Plane(origin=(0, 10, 0), x_dir=(1, 0, 0), z_dir=(0, 1, 0))):
        with Locations((-15.150201759, -13.023070146)):
            Rectangle(SKETCH18_W, SKETCH18_H)
        with Locations((54.649798241, -13.023070146)):
            Rectangle(SKETCH18_W, SKETCH18_H)
    extrude(amount=-CUT_EXTRUDE14_DEPTH, mode=Mode.SUBTRACT)

    # Sketch19 → Cut-Extrude15 (cut)
    with BuildSketch(Plane(origin=(0, 10, 0), x_dir=(1, 0, 0), z_dir=(0, 1, 0))):
        with Locations((-15.790088122, -23.373070146)):
            Rectangle(SKETCH19_W, SKETCH19_H)
        with Locations((55.289684604, -23.373070146)):
            Rectangle(SKETCH19_W, SKETCH19_H)
    extrude(amount=-CUT_EXTRUDE15_DEPTH, mode=Mode.SUBTRACT)

    # Chamfer1
    # the kernel refuses this chamfer: 2 mm, written as the material it takes off along each edge
    with BuildSketch(Plane(origin=(48.789684604, 15.143365976, 22.623070146), x_dir=(0.027495876610585647, 0, 0.9996219169112968), z_dir=(0, -1, 0))) as chamfer1_piece_1_section:
        Polygon((CHAMFER1_SIZE * 0.999621916911, CHAMFER1_SIZE * 0.0274958766106), (-CHAMFER1_SIZE * 0.0274958766106, CHAMFER1_SIZE * 0.999621916911), (0, 0), align=None)
    chamfer1_piece_1 = extrude(amount=12.043365976, mode=Mode.PRIVATE)
    chamfer1_piece_1 = split(chamfer1_piece_1, bisect_by=Plane(origin=(48.085766383, 9.121682988, 24.123070146), z_dir=(0, 0, -1)), keep=Keep.TOP, mode=Mode.PRIVATE)
    add(chamfer1_piece_1, mode=Mode.SUBTRACT)
    with BuildSketch(Plane(origin=(-9.290088122, 15.143365976, 22.623070146), x_dir=(0.9996219169112968, 0, -0.027495876610585623), z_dir=(0, -1, 0))) as chamfer1_piece_2_section:
        Polygon((CHAMFER1_SIZE * 0.999621916911, CHAMFER1_SIZE * 0.0274958766106), (-CHAMFER1_SIZE * 0.0274958766106, CHAMFER1_SIZE * 0.999621916911), (0, 0), align=None)
    chamfer1_piece_2 = extrude(amount=12.043365976, mode=Mode.PRIVATE)
    chamfer1_piece_2 = split(chamfer1_piece_2, bisect_by=Plane(origin=(-8.586169901, 9.121682988, 24.123070146), z_dir=(0, 0, -1)), keep=Keep.TOP, mode=Mode.PRIVATE)
    add(chamfer1_piece_2, mode=Mode.SUBTRACT)

    # Fillet4
    fillet4_edges = [part.edges().sort_by_distance(p)[0] for p in [
        (31.610186999, 7.05, 9.123070146),
        (6.016620544, 7.05, 9.123070146),
    ]]
    fillet(fillet4_edges, radius=FILLET4_R)

    # Sketch20 → Cut-Extrude16 (cut, up to next)
    with BuildSketch(Plane(origin=(0, 3.1, 0), x_dir=(1, 0, 0), z_dir=(0, 1, 0)), mode=Mode.PRIVATE) as cut_extrude16_sk1:
        with Locations(Location((-20.750201759, -18.623070146, 0), (0, 0, 270))):
            Circle(SKETCH20_R)
    cut_extrude16_tool1 = extrude(cut_extrude16_sk1.sketch, amount=-CUT_EXTRUDE16_REACH, mode=Mode.PRIVATE) & part.part
    # Sketch20 → Cut-Extrude16 (cut, up to next)
    with BuildSketch(Plane(origin=(0, 3.1, 0), x_dir=(1, 0, 0), z_dir=(0, 1, 0)), mode=Mode.PRIVATE) as cut_extrude16_sk2:
        with Locations(Location((-9.750201759, -18.623070146, 0), (0, 0, 270))):
            Circle(SKETCH20_R)
    cut_extrude16_tool2 = extrude(cut_extrude16_sk2.sketch, amount=-CUT_EXTRUDE16_REACH, mode=Mode.PRIVATE) & part.part
    # Sketch20 → Cut-Extrude16 (cut, up to next)
    with BuildSketch(Plane(origin=(0, 3.1, 0), x_dir=(1, 0, 0), z_dir=(0, 1, 0)), mode=Mode.PRIVATE) as cut_extrude16_sk3:
        with Locations(Location((49.249798241, -18.623070146, 0), (0, 0, 270))):
            Circle(SKETCH20_R)
    cut_extrude16_tool3 = extrude(cut_extrude16_sk3.sketch, amount=-CUT_EXTRUDE16_REACH, mode=Mode.PRIVATE) & part.part
    # Sketch20 → Cut-Extrude16 (cut, up to next)
    with BuildSketch(Plane(origin=(0, 3.1, 0), x_dir=(1, 0, 0), z_dir=(0, 1, 0)), mode=Mode.PRIVATE) as cut_extrude16_sk4:
        with Locations(Location((60.249798241, -18.623070146, 0), (0, 0, 270))):
            Circle(SKETCH20_R)
    cut_extrude16_tool4 = extrude(cut_extrude16_sk4.sketch, amount=-CUT_EXTRUDE16_REACH, mode=Mode.PRIVATE) & part.part
    add(cut_extrude16_tool1.solids().sort_by_distance((-20.750202, 3.1, 18.62307))[0], mode=Mode.SUBTRACT)
    add(cut_extrude16_tool2.solids().sort_by_distance((-9.750202, 3.1, 18.62307))[0], mode=Mode.SUBTRACT)
    add(cut_extrude16_tool3.solids().sort_by_distance((49.249798, 3.1, 18.62307))[0], mode=Mode.SUBTRACT)
    add(cut_extrude16_tool4.solids().sort_by_distance((60.249798, 3.1, 18.62307))[0], mode=Mode.SUBTRACT)

    # Sketch21 → Cut-Extrude17 (cut)
    with BuildSketch(Plane(origin=(0, 4.1, 0), x_dir=(1, 0, 0), z_dir=(0, 1, 0)).offset(CUT_EXTRUDE17_START)):
        Polygon((15.153604163, -0.73398285), (23.638885538, -9.219264224), (24.345992319, -8.512157443), (15.860710945, -0.026876069), align=None)
    extrude(amount=CUT_EXTRUDE17_DEPTH, mode=Mode.SUBTRACT)

    # Sketch22 → Cut-Extrude18 (cut)
    with BuildSketch(Plane(origin=(0, 4.1, 0), x_dir=(1, 0, 0), z_dir=(0, 1, 0))):
        with Locations((19.749798241, -4.623070146)):
            Rectangle(SKETCH22_W, SKETCH22_H)
    extrude(amount=-CUT_EXTRUDE18_DEPTH, mode=Mode.SUBTRACT)


solid = part.part
